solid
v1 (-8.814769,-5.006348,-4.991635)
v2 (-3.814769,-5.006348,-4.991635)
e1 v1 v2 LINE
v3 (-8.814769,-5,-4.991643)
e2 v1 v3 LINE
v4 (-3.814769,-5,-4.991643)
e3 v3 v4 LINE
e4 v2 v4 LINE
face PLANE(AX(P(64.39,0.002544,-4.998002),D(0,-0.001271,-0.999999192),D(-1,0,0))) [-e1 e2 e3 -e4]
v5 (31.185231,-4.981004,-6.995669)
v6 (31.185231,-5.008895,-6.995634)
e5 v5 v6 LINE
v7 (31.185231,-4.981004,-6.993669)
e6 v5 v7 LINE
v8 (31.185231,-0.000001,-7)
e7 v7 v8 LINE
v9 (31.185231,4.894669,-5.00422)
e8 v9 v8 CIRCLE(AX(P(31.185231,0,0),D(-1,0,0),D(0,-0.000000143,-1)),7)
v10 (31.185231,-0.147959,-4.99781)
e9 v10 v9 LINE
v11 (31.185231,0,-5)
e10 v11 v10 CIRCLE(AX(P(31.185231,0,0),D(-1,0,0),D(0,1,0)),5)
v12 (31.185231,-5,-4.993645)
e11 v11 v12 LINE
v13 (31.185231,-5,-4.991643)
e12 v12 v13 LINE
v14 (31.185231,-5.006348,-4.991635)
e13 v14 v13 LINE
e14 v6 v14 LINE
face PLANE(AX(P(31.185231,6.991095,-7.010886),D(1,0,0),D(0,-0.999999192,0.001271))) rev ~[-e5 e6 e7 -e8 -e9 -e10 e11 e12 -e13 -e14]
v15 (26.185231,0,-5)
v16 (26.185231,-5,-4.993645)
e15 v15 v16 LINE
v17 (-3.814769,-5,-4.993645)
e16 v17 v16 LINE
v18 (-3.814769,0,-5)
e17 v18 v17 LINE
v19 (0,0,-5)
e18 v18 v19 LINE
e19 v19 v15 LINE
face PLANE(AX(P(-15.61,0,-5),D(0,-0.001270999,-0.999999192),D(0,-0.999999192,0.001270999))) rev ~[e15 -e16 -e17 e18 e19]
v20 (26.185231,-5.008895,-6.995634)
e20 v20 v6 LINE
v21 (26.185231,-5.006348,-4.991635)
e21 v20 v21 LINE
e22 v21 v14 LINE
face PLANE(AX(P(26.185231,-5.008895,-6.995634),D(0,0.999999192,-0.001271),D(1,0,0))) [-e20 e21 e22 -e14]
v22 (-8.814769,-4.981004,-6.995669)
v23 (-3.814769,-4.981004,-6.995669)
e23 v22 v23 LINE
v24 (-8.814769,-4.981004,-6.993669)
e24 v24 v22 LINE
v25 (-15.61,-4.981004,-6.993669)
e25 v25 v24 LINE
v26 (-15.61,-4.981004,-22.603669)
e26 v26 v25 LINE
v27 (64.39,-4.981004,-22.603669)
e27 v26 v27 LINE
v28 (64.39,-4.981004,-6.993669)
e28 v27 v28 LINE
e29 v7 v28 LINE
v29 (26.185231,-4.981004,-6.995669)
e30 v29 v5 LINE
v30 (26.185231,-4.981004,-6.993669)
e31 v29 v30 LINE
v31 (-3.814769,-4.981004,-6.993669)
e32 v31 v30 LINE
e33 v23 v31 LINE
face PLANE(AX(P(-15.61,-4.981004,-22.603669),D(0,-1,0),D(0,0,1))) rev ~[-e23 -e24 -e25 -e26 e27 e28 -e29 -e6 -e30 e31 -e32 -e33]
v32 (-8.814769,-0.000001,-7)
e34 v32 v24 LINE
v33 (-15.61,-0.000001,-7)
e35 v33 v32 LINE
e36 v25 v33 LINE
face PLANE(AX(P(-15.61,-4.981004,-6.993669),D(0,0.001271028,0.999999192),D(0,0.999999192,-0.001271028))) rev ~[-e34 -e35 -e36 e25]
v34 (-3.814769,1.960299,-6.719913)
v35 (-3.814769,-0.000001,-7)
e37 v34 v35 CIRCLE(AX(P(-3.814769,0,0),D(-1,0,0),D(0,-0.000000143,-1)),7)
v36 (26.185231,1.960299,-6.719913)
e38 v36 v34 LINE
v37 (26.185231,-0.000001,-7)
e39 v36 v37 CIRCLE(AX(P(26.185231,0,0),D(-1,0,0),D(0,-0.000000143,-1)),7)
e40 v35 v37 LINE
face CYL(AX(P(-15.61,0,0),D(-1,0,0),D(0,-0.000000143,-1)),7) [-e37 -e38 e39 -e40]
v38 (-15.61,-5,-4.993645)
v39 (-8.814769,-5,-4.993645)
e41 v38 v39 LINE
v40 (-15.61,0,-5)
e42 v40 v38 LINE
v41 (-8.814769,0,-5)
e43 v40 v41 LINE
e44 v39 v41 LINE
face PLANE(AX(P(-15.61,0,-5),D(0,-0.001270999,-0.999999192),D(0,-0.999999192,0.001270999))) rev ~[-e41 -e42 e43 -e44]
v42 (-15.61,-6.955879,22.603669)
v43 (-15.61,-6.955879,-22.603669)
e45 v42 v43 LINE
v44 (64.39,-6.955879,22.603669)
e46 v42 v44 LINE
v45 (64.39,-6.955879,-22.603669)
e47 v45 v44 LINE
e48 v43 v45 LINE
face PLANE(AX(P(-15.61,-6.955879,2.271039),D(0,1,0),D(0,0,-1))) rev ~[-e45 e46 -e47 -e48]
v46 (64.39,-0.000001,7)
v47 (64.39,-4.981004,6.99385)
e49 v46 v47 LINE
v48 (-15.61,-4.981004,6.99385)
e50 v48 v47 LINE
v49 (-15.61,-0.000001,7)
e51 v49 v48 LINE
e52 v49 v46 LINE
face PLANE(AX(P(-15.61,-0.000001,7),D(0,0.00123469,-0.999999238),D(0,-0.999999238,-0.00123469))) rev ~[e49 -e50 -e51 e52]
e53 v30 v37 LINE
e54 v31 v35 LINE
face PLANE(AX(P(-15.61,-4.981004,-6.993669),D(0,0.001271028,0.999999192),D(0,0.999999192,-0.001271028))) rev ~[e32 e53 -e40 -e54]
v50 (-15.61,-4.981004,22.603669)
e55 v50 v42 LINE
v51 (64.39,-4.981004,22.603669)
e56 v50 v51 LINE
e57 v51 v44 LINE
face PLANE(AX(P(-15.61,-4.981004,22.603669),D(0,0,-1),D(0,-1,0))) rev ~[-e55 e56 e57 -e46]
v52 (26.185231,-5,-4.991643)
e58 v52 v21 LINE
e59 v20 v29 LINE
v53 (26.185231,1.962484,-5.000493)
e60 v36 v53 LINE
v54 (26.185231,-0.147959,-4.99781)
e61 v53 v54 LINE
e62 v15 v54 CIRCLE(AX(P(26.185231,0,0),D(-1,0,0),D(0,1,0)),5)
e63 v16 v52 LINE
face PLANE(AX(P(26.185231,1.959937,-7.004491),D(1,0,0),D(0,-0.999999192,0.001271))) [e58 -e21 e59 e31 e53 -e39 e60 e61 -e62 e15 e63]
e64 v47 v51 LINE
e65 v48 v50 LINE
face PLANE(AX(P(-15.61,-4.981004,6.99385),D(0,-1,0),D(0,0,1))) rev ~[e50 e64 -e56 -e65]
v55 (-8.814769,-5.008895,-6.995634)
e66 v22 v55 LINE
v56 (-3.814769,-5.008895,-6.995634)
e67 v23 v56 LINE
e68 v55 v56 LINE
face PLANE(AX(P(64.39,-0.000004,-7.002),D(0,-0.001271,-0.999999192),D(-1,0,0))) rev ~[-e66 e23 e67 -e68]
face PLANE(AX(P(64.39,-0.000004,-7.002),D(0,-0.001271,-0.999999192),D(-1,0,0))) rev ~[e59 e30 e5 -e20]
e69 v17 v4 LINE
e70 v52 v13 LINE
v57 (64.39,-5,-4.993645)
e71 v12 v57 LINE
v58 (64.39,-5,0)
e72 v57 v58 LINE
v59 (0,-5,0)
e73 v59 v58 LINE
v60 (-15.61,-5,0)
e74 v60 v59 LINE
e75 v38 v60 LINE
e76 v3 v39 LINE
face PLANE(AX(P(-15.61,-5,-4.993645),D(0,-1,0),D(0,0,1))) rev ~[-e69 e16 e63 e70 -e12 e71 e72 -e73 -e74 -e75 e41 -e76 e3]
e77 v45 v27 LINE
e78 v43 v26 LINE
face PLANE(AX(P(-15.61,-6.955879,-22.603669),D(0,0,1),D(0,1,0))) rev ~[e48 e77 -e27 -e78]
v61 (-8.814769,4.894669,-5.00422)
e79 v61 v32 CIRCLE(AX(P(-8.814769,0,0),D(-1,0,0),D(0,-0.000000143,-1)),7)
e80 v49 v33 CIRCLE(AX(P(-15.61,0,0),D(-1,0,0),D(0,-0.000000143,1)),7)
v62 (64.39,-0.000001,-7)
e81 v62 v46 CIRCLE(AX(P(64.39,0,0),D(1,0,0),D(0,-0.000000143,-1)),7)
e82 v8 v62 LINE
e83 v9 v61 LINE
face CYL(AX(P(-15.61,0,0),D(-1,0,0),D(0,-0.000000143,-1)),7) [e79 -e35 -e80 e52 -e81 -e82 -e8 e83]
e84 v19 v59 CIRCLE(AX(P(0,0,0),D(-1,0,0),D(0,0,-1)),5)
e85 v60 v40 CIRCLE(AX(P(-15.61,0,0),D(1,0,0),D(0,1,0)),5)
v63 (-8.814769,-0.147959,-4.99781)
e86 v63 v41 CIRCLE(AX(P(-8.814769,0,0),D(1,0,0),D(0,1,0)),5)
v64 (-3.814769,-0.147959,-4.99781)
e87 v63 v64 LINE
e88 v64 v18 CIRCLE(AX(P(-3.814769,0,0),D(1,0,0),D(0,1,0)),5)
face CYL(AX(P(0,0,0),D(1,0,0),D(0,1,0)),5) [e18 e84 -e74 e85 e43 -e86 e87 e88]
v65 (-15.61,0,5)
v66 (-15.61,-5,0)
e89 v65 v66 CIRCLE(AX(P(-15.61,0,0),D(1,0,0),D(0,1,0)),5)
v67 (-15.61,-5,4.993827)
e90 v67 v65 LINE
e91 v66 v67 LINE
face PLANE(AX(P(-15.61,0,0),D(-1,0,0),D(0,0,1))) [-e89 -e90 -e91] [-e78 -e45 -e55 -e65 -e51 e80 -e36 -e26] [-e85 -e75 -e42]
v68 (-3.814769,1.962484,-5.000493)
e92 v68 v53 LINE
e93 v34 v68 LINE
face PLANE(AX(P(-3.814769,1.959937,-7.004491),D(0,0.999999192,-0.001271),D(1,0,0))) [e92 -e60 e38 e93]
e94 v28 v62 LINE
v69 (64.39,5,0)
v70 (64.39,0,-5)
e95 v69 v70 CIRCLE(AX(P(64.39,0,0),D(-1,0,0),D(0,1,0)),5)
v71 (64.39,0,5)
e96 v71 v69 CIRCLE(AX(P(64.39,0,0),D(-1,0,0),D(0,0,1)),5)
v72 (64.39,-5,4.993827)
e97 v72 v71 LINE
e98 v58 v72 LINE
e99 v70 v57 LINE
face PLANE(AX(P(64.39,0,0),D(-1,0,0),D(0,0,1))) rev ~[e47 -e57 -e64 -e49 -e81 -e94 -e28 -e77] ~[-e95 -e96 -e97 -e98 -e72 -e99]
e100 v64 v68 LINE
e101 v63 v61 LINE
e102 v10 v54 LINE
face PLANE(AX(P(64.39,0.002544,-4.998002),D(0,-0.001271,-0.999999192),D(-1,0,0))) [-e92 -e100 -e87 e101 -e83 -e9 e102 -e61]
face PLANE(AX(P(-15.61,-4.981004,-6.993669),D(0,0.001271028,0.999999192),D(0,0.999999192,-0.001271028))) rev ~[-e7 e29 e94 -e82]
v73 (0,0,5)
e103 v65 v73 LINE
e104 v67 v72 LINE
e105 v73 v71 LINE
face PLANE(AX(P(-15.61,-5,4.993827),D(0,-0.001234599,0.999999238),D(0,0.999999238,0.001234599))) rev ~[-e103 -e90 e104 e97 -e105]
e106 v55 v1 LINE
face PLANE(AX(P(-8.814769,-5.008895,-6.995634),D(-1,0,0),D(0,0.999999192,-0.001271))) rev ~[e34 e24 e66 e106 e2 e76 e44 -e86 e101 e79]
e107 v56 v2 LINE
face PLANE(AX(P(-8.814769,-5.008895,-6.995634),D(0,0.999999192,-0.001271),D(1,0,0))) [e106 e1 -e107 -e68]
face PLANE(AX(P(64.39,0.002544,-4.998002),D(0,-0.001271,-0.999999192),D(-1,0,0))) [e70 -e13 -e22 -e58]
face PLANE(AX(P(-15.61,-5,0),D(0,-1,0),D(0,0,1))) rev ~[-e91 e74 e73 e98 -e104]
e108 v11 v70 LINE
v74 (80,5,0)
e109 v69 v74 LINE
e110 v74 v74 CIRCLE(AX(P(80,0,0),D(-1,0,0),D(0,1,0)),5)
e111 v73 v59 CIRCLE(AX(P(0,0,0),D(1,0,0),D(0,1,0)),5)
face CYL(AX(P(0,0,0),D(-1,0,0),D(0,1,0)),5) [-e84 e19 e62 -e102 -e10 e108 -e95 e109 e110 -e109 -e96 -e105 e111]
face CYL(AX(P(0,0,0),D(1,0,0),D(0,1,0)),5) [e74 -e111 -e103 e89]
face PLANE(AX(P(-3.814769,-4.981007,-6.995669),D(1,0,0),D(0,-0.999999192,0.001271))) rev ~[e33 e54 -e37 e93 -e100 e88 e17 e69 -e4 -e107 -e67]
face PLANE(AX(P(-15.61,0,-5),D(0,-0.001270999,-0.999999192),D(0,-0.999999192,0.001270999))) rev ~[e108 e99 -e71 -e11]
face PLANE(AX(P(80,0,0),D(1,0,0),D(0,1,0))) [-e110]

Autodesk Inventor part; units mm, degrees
ref_plane "YZ Plane" through (0, 0, 0) normal (1, 0, 0) x (0, 1, 0)
ref_plane "XZ Plane" through (0, 0, 0) normal (0, 1, 0) x (-1, 0, 0)
ref_plane "XY Plane" through (0, 0, 0) normal (0, 0, 1) x (1, 0, 0)
sketch "Цилиндр" plane through (0, 0, 0) normal (1, 0, 0) x (0, 1, 0)
  line L0 (5, 0) -> (-5, 0)
  line L1 (0, 5) -> (0, -5)
  circle A0 centre (0, 0) radius 5
  dimension "d0" = 10
extrude "Выдавливание1" add sketch "Цилиндр" along normal blind 80 and the other way blind 15.61
sketch "Корпус" plane through (-15.61, 0, 0) normal (-1, 0, 0) x (0, 0, 1)
  arc A0 (5, 0) -> (-5, 0) centre (0, 0) ccw
  circle A1 centre (0, 0) radius 5
  line L0 (0, 5) -> (0, -5)
  line L1 (-5, 0) -> (5, 0)
  line L2 (-4.999794, -5) -> (5, -5)
  arc A2 (5, 0) -> (-5, 0) centre (0, 0) ccw
  line L3 (5, 0) -> (4.993827, -5)
  line L4 (-4.993645, -5) -> (-5, 0)
  line L5 (-22.603669, -4.981004) -> (-22.603669, -6.955879)
  arc A3 (0, 7) -> (-7, -0.000001) centre (0, 0) ccw
  line L6 (-22.603669, -6.955879) -> (2.271039, -6.955879)
  line L7 (22.603669, -4.981004) -> (22.603669, -6.955879)
  arc A4 (7, -0.000001) -> (0, 7) centre (0, 0) ccw
  line L8 (22.603669, -6.955879) -> (2.271039, -6.955879)
  line L9 (-6.993669, -4.981004) -> (-7, -0.000001)
  line L10 (-22.603669, -4.981004) -> (-6.993669, -4.981004)
  line L11 (7, -0.000001) -> (6.99385, -4.981004)
  line L12 (22.603669, -4.981004) -> (6.99385, -4.981004)
  dimension "d12" = 15.61
sketch "Корпус outline for Выдавливание2" plane through (-15.61, 0, 0) normal (-1, 0, 0) x (0, 0, 1)
  line L0 (-22.603669, -6.955879) -> (-22.603669, -4.981004)
  line L1 (2.271039, -6.955879) -> (-22.603669, -6.955879)
  line L2 (-22.603669, -4.981004) -> (-6.993669, -4.981004)
  line L3 (22.603669, -6.955879) -> (2.271039, -6.955879)
  line L4 (-6.993669, -4.981004) -> (-7, -0.000001)
  line L5 (22.603669, -4.981004) -> (22.603669, -6.955879)
  arc A0 (-7, -0.000001) -> (0, 7) centre (0, 0) cw
  line L6 (6.99385, -4.981004) -> (22.603669, -4.981004)
  arc A1 (0, 7) -> (7, -0.000001) centre (0, 0) cw
  line L7 (7, -0.000001) -> (6.99385, -4.981004)
  arc A2 (5, 0) -> (0, 5) centre (0, 0) ccw
  arc A3 (0, 5) -> (-5, 0) centre (0, 0) ccw
  line L8 (-5, 0) -> (-4.993645, -5)
  line L9 (-4.993645, -5) -> (0, -5)
  line L10 (0, -5) -> (4.993827, -5)
  line L11 (4.993827, -5) -> (5, 0)
extrude "Выдавливание2" add sketch "Корпус outline for Выдавливание2" against normal blind 80
sketch "Выемка" plane through (64.39, -0.000001, -7) normal (0, -0.001271, -0.9999992) x (-1, 0, 0)
  line L0 (80, -4.981007) -> (80, 0)
  line L1 (80, 0) -> (0, 0)
  line L2 (0, -4.981007) -> (0, 0)
  line L3 (80, -4.981007) -> (0, -4.981007)
  line L4 (80, -5.008896) -> (-15.61, -5.008896)
  line L5 (80, 6.991104) -> (0, 6.991104)
  line L6 (33.204769, 6.991104) -> (33.204769, -5.008896)
  line L7 (33.204769, 6.991104) -> (73.204769, 6.991104)
  line L8 (73.204769, -5.008896) -> (73.204769, 6.991104)
  line L9 (33.204769, -5.008896) -> (73.204769, -5.008896)
  line L10 (38.204769, 1.959942) -> (38.204769, -5.008896)
  line L11 (68.204769, 1.959942) -> (68.204769, -5.008896)
  line L12 (38.204769, -5.008896) -> (38.204769, 1.959942)
  line L13 (68.204769, 1.959942) -> (38.204769, 1.959942)
  line L14 (33.204769, -5.008896) -> (38.204769, -5.008896)
  line L15 (68.204769, -5.008896) -> (73.204769, -5.008896)
  point P0 (64.39, -0.008896)
  dimension "d15" = 30
  dimension "d22" = 5
  dimension "d23" = 5
extrude "Выдавливание3" cut sketch "Выемка" against normal blind 2 contours L8 L4 L11 L3 | L3 L11 L1 L8 | L1 L11 L13 L10 L6 L5 L8 | L10 L4 L6 L3 | L3 L6 L1 L10
properties part number "lw_5"
